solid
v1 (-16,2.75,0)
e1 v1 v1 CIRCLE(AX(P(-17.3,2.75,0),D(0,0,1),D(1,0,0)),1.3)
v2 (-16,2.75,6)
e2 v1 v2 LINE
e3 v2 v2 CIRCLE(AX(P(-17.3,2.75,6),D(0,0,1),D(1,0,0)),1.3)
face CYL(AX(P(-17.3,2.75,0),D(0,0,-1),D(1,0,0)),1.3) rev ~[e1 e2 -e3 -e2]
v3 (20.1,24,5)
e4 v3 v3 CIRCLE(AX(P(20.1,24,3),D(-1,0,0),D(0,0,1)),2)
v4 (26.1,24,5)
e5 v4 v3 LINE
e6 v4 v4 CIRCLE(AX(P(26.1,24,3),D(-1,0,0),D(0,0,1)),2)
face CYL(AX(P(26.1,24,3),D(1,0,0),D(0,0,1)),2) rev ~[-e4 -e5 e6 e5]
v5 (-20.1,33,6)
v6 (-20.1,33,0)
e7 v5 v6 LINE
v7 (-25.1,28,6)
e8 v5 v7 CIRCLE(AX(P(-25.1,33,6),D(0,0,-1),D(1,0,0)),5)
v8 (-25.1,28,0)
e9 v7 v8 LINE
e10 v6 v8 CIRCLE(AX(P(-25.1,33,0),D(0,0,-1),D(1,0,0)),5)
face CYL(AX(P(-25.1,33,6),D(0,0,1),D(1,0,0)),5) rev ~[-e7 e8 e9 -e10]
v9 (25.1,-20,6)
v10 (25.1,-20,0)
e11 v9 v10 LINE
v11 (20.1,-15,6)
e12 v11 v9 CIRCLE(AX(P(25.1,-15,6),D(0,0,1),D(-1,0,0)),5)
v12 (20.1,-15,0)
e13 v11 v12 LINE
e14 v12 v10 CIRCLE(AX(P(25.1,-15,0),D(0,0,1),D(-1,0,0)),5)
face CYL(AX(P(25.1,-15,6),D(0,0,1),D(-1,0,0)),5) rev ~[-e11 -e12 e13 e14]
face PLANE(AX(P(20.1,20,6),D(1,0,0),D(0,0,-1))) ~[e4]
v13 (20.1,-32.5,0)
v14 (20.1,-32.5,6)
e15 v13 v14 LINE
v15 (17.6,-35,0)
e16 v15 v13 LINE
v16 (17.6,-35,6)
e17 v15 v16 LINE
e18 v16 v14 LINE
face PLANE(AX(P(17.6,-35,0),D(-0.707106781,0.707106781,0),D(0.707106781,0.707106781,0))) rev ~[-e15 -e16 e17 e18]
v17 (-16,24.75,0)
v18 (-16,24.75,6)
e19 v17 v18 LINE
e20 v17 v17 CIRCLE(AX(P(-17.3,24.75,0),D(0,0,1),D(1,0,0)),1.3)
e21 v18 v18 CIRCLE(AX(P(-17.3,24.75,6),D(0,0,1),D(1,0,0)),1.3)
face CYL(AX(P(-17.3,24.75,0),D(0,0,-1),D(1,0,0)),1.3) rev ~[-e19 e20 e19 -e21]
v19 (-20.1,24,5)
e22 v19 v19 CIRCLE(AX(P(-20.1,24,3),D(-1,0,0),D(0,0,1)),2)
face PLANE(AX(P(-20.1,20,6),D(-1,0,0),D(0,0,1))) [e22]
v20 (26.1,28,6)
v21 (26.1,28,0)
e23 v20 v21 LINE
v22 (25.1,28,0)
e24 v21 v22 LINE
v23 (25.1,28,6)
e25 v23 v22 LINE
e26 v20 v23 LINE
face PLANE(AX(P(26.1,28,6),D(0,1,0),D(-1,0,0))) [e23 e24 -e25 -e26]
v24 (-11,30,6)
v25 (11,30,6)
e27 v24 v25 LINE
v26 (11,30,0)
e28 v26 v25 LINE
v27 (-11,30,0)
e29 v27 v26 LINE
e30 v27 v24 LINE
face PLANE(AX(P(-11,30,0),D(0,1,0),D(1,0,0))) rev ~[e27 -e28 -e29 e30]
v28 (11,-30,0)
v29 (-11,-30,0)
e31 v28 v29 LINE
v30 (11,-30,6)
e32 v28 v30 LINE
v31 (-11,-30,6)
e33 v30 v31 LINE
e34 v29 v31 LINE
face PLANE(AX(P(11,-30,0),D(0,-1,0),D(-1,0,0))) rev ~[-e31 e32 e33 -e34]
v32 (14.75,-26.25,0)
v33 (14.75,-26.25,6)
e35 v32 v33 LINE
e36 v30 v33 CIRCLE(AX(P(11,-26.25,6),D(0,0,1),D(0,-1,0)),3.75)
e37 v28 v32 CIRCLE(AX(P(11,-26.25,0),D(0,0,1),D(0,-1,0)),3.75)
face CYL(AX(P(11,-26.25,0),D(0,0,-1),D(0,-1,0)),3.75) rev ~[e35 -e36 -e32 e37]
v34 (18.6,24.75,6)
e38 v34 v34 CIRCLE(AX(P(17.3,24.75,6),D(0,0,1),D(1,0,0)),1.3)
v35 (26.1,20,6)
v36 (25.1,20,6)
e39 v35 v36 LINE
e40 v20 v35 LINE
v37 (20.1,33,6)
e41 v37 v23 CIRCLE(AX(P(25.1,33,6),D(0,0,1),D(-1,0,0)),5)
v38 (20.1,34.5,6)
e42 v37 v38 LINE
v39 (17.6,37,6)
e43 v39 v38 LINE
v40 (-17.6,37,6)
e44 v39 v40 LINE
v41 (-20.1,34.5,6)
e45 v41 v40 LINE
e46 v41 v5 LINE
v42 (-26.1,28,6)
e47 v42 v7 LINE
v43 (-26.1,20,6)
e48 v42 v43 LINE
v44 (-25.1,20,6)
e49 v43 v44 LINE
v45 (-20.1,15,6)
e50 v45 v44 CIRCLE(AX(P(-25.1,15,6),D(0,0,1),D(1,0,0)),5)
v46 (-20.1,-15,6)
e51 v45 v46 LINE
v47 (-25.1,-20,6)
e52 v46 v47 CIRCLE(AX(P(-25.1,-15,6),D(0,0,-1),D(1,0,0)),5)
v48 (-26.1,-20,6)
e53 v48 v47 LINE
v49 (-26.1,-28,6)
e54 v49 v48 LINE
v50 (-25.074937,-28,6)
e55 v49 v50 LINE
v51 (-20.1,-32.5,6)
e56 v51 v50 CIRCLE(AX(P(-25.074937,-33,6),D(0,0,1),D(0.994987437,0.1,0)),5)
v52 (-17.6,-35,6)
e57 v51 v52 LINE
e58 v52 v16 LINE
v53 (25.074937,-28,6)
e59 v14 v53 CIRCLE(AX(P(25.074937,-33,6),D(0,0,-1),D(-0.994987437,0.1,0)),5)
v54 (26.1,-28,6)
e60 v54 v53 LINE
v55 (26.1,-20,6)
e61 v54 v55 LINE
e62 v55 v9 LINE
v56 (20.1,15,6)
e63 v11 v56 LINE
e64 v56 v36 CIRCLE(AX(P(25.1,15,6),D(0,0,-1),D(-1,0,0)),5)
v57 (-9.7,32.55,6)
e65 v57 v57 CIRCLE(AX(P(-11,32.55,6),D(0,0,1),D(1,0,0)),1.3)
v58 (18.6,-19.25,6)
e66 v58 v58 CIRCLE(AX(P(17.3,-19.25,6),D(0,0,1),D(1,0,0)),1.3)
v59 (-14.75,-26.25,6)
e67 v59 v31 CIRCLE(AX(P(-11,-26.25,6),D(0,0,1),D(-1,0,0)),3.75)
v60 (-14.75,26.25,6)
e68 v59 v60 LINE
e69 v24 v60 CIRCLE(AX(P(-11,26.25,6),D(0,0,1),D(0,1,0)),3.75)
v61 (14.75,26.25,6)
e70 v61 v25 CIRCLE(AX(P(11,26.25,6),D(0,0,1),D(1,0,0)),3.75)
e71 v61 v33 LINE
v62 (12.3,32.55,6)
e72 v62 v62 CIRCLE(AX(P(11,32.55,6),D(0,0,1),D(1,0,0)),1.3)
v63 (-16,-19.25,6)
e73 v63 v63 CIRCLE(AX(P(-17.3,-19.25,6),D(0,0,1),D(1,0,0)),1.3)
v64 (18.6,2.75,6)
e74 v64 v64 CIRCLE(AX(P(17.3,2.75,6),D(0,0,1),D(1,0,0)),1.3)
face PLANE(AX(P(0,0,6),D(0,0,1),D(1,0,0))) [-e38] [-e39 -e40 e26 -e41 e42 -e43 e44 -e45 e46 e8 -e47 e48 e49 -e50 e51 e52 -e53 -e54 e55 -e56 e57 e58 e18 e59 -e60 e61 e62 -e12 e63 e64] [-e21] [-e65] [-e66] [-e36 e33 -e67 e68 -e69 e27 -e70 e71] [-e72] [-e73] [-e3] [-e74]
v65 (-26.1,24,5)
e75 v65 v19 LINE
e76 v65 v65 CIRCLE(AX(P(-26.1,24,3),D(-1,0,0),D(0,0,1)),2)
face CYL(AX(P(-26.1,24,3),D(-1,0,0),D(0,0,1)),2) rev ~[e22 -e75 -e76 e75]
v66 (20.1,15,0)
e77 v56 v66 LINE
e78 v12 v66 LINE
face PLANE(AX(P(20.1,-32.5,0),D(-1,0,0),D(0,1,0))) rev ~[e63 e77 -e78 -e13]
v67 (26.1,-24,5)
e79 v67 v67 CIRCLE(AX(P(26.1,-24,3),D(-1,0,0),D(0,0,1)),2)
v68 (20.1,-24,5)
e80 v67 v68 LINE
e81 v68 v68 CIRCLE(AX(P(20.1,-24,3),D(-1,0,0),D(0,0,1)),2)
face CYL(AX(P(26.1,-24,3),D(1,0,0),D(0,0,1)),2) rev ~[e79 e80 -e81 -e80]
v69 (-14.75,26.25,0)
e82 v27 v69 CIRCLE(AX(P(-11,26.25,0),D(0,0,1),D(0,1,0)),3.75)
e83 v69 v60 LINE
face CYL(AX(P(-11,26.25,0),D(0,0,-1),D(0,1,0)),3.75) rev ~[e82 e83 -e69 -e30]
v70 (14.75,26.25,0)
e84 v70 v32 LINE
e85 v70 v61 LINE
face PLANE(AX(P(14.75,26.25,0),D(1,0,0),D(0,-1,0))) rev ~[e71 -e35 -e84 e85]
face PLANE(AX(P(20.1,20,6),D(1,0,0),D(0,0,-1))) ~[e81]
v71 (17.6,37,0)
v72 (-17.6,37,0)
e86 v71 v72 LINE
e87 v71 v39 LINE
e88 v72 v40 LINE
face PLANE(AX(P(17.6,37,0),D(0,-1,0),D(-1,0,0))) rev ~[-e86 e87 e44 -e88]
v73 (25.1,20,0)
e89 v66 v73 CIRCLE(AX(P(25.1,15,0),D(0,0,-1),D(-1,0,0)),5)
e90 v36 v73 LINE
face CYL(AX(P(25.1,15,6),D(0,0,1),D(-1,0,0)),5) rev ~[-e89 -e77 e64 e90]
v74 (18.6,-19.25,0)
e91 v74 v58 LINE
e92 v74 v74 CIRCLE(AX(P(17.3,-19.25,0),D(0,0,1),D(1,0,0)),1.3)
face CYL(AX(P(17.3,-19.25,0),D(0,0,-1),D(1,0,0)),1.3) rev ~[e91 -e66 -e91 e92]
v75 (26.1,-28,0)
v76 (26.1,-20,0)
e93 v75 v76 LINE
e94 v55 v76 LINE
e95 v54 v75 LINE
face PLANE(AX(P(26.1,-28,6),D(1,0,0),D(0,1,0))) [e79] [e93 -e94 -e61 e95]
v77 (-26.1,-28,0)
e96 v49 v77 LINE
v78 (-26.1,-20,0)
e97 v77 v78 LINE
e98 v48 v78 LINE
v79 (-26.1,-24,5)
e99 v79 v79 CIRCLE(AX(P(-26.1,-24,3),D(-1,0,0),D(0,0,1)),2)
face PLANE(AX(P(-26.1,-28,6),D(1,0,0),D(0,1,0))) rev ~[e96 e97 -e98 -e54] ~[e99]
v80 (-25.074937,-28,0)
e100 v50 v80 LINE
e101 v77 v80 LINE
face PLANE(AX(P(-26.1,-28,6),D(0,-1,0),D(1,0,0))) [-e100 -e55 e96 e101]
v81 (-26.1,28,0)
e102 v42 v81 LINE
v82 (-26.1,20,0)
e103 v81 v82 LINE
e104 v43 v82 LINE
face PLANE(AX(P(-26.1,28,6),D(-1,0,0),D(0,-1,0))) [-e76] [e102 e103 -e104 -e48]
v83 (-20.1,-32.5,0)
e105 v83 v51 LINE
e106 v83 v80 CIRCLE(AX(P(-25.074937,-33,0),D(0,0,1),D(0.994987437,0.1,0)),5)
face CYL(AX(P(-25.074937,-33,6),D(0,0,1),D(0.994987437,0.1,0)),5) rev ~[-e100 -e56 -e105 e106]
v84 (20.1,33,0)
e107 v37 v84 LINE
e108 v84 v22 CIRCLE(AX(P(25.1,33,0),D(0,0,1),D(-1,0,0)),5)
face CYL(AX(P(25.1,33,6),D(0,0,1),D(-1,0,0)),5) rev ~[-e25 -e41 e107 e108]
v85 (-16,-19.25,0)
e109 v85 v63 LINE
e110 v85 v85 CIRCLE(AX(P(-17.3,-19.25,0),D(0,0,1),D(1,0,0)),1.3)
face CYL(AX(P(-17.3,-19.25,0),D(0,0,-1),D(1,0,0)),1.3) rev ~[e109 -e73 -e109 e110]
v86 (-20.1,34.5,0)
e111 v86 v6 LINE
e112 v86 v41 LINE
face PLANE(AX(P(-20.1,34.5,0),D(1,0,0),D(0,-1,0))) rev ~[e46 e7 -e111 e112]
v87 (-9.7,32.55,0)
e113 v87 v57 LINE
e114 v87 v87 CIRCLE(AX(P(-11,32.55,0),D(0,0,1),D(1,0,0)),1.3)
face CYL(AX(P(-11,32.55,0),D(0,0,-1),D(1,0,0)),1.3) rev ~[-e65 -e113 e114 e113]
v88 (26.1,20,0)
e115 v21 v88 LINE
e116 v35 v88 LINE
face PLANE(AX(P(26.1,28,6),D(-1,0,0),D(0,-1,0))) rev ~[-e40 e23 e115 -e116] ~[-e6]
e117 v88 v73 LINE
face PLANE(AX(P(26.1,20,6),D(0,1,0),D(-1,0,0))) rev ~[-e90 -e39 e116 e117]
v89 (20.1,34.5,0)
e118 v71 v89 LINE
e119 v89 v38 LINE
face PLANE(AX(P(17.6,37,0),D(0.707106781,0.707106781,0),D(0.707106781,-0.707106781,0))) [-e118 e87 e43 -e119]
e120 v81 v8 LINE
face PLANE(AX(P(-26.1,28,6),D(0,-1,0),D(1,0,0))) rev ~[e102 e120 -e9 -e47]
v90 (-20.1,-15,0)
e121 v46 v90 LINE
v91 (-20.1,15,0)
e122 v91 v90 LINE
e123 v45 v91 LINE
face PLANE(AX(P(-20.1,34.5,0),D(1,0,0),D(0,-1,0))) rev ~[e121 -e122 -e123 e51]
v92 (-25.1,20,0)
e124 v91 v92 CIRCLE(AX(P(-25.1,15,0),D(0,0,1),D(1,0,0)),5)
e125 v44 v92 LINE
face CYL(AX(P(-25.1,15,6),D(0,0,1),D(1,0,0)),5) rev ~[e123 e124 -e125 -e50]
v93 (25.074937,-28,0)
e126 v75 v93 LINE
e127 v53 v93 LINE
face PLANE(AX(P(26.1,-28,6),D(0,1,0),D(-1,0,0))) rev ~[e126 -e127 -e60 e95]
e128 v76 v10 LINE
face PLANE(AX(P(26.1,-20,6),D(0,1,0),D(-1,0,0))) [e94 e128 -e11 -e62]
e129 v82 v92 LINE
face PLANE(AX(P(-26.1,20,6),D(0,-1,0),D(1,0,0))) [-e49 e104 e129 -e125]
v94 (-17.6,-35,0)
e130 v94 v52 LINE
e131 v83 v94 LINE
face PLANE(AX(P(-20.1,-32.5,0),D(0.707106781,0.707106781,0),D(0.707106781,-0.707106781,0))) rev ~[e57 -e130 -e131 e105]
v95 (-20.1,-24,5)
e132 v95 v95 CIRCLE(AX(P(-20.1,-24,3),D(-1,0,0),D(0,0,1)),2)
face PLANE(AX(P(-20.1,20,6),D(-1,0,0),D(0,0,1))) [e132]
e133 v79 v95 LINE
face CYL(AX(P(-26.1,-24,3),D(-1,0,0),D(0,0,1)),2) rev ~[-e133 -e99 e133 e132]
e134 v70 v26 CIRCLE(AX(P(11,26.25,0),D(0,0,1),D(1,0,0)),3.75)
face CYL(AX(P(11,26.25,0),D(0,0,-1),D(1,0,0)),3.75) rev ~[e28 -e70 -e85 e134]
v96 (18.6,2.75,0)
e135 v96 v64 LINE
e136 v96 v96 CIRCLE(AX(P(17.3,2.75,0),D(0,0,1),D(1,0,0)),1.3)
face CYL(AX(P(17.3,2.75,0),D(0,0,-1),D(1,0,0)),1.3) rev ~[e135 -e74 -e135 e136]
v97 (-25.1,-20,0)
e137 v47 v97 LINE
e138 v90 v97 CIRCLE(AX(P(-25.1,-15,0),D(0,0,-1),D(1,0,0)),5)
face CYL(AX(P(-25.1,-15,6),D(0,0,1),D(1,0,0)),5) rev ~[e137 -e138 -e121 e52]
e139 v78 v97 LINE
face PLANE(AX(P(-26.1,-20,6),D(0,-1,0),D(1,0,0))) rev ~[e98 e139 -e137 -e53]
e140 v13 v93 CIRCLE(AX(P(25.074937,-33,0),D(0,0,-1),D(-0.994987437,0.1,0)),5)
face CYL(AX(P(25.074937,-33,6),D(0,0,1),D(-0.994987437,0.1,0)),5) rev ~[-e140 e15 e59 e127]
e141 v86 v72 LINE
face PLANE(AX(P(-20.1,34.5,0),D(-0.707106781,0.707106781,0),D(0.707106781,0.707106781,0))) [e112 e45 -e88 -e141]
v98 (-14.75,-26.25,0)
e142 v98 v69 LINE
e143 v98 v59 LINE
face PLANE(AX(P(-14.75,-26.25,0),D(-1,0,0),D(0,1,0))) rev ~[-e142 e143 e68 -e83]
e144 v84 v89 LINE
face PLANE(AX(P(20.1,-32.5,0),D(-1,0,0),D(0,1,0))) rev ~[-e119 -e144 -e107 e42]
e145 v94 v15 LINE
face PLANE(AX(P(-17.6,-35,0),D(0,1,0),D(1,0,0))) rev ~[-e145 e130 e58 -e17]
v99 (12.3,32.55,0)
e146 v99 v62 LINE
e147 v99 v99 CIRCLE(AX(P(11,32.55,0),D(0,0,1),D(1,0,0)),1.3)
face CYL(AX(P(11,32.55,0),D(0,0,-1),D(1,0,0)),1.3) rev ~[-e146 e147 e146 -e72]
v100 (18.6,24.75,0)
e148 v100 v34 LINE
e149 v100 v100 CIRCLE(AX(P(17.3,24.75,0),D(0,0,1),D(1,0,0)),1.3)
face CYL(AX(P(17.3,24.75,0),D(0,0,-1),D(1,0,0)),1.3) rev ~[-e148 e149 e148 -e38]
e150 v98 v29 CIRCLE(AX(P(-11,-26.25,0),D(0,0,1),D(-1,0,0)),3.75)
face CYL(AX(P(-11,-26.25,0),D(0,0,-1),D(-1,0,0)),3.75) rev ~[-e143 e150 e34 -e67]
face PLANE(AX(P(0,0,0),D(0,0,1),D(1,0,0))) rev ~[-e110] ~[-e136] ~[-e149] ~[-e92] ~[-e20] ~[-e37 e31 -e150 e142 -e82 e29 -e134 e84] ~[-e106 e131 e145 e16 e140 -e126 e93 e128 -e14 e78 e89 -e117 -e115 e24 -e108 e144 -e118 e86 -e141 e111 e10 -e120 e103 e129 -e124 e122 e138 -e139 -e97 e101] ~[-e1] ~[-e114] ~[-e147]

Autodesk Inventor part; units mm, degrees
ref_plane "YZ Plane" through (0, 0, 0) normal (1, 0, 0) x (0, 1, 0)
ref_plane "XZ Plane" through (0, 0, 0) normal (0, 1, 0) x (-1, 0, 0)
ref_plane "XY Plane" through (0, 0, 0) normal (0, 0, 1) x (1, 0, 0)
sketch "Sketch1" plane through (0, 0, 0) normal (0, 0, 1) x (1, 0, 0)
  line L0 (-11, -29.75) -> (11, -29.75) construction
  line L1 (14.5, -26.25) -> (14.5, 26.25) construction
  line L2 (11, 29.75) -> (-11, 29.75) construction
  line L3 (-14.5, 26.25) -> (-14.5, -26.25) construction
  line L4 (-14.5, -29.75) -> (14.5, 29.75) construction
  line L5 (14.5, -29.75) -> (-14.5, 29.75) construction
  arc A0 (-11, 29.75) -> (-14.5, 26.25) centre (-11, 26.25) ccw construction
  arc A1 (14.5, 26.25) -> (11, 29.75) centre (11, 26.25) ccw construction
  arc A2 (11, -29.75) -> (14.5, -26.25) centre (11, -26.25) ccw
  arc A3 (-14.5, -26.25) -> (-11, -29.75) centre (-11, -26.25) ccw construction
  line L6 (-17.6, -35) -> (17.6, -35)
  line L7 (20.1, -32.5) -> (20.1, 34.5)
  line L8 (17.6, 37) -> (-17.6, 37)
  line L9 (-20.1, 34.5) -> (-20.1, -32.5)
  line L10 (-20.1, -35) -> (20.1, 37) construction
  line L11 (20.1, -35) -> (-20.1, 37) construction
  line L12 (-20.1, 34.5) -> (-17.6, 37)
  line L13 (-20.1, -32.5) -> (-17.6, -35)
  line L14 (17.6, -35) -> (20.1, -32.5)
  line L15 (17.6, 37) -> (20.1, 34.5)
  circle A4 centre (0, -15.25) radius 14 construction
  circle A5 centre (-17.3, -19.25) radius 1.3
  circle A6 centre (-17.3, 2.75) radius 1.3
  circle A7 centre (-17.3, 24.75) radius 1.3
  circle A8 centre (-11, 32.55) radius 1.3
  line L16 (0, -15.25) -> (0, -1.25) construction
  circle A9 centre (17.3, -19.25) radius 1.3
  circle A10 centre (17.3, 2.75) radius 1.3
  circle A11 centre (17.3, 24.75) radius 1.3
  circle A12 centre (11, 32.55) radius 1.3
  line L17 (-11, 30) -> (11, 30)
  arc A13 (14.75, 26.25) -> (11, 30) centre (11, 26.25) ccw
  line L18 (14.75, 26.25) -> (14.75, -26.25)
  arc A14 (11, -30) -> (14.75, -26.25) centre (11, -26.25) ccw
  line L19 (11, -30) -> (-11, -30)
  arc A15 (-14.75, -26.25) -> (-11, -30) centre (-11, -26.25) ccw
  line L20 (-14.75, -26.25) -> (-14.75, 26.25)
  arc A16 (-11, 30) -> (-14.75, 26.25) centre (-11, 26.25) ccw
  point P0 (0, 0)
  point P1 (0, 1)
  point P2 (0, 29.75)
  dimension "d14" = 28
  dimension "d0" = 29
  dimension "d1" = 59.5
  dimension "d2" = 3.5
  dimension "d3" = 40.2
  dimension "d4" = 72
  dimension "d6" = 2.5
  dimension "d7" = 2.5
  dimension "d8" = 2.5
  dimension "d9" = 2.5
  dimension "d10" = 2.5
  dimension "d11" = 2.5
  dimension "d12" = 2.5
  dimension "d13" = 2.5
  dimension "d15" = 45
  dimension "d16" = 2.6
  dimension "d17" = 17.3
  dimension "d18" = 4
  dimension "d19" = 2.6
  dimension "d20" = 22
  dimension "d21" = 2.6
  dimension "d22" = 22
  dimension "d24" = 2.6
  dimension "d26" = 7.8
  dimension "d27" = 11
  dimension "d28" = 1
  dimension "d51" = 0.25
extrude "Extrusion1" add sketch "Sketch1" along normal blind 6
sketch "Sketch2" plane through (0, 0, 6) normal (0, 0, 1) x (1, 0, 0)
  line L0 (26.1, 28) -> (26.1, 20)
  line L1 (20.1, -32.5) -> (20.1, 34.5) projected
  line L2 (26.1, 20) -> (20.1, 20)
  line L3 (26.1, 28) -> (20.1, 28)
  line L4 (-14.5, 0) -> (14.5, 0) construction
  line L5 (0, 29.4068) -> (0, -29.4068) construction
  line L6 (-26.1, 28) -> (-26.1, 20)
  line L7 (-26.1, 20) -> (-20.1, 20)
  line L8 (-26.1, 28) -> (-20.1, 28)
  line L9 (26.1, -28) -> (26.1, -20)
  line L10 (26.1, -20) -> (20.1, -20)
  line L11 (26.1, -28) -> (20.1, -28)
  line L12 (-26.1, -20) -> (-20.1, -20)
  line L13 (-26.1, -28) -> (-26.1, -20)
  line L14 (-26.1, -28) -> (-20.1, -28)
  line L15 (-20.1, 28) -> (-20.1, 20)
  line L16 (-20.1, 34.5) -> (-20.1, -32.5) projected
  line L17 (-20.1, -20) -> (-20.1, -28)
  line L18 (-20.1, 34.5) -> (-20.1, -32.5) projected
  point P0 (0, 0)
  point P1 (26.1, 24)
  point P2 (20.1, -20)
  point P3 (20.1, -28)
  point P4 (0, 0)
  dimension "d31" = 24
  dimension "d32" = 8
  dimension "d33" = 6
extrude "Extrusion2" add sketch "Sketch2" against normal up to surface (6 mm away)
fillet "Fillet1" radius 5 8 edges at (20.1, 28, 3) (-20.1, 28, 3) (-20.1, -20, 3) (-20.1, -28, 3) (20.1, -28, 3) (20.1, 20, 3) (20.1, -20, 3) (-20.1, 20, 3)
sketch "Sketch3" plane through (-26.1, 20, 6) normal (-1, 0, 0) x (0, 0, 1)
  line L0 (-6, 0) -> (-6, 8) construction
  line L1 (0, 0) -> (-6, 0) construction
  line L2 (0, 8) -> (0, 0) construction
  line L3 (0, 8) -> (-6, 8) construction
  line L4 (0, 8) -> (-6, 0) construction
  circle A0 centre (-3, 4) radius 2
  line L5 (-6, -48) -> (-6, -40) construction
  line L6 (0, -48) -> (-6, -48) construction
  line L7 (0, -40) -> (0, -48) construction
  line L8 (0, -40) -> (-6, -40) construction
  line L9 (0, -40) -> (-6, -48) construction
  circle A1 centre (-3, -44) radius 2
  point P0 (-6, -20)
  dimension "d37" = 4
  dimension "d38" = 4
extrude "Extrusion3" cut sketch "Sketch3" against normal blind 6
mirror "Mirror1" about plane through (0, 0, 0) normal (1, 0, 0) of "Extrusion3"
thread "Thread1" size "M4x0.7" class "6H" standard "ANSI Metric M Profile" full length
thread "Thread2" size "M4x0.7" class "6H" standard "ANSI Metric M Profile" full length
thread "Thread3" size "M4x0.7" class "6H" standard "ANSI Metric M Profile" full length
thread "Thread4" size "M4x0.7" class "6H" standard "ANSI Metric M Profile" full length
equation "\"d7\" = d6"
equation "\"d8\" = d6"
equation "\"d9\" = d8"
equation "\"d10\" = d6"
equation "\"d11\" = d10"
equation "\"d12\" = d6"
equation "\"d13\" = d12"
properties part number "DynamixelServoMount" material "Aluminum 6061"
